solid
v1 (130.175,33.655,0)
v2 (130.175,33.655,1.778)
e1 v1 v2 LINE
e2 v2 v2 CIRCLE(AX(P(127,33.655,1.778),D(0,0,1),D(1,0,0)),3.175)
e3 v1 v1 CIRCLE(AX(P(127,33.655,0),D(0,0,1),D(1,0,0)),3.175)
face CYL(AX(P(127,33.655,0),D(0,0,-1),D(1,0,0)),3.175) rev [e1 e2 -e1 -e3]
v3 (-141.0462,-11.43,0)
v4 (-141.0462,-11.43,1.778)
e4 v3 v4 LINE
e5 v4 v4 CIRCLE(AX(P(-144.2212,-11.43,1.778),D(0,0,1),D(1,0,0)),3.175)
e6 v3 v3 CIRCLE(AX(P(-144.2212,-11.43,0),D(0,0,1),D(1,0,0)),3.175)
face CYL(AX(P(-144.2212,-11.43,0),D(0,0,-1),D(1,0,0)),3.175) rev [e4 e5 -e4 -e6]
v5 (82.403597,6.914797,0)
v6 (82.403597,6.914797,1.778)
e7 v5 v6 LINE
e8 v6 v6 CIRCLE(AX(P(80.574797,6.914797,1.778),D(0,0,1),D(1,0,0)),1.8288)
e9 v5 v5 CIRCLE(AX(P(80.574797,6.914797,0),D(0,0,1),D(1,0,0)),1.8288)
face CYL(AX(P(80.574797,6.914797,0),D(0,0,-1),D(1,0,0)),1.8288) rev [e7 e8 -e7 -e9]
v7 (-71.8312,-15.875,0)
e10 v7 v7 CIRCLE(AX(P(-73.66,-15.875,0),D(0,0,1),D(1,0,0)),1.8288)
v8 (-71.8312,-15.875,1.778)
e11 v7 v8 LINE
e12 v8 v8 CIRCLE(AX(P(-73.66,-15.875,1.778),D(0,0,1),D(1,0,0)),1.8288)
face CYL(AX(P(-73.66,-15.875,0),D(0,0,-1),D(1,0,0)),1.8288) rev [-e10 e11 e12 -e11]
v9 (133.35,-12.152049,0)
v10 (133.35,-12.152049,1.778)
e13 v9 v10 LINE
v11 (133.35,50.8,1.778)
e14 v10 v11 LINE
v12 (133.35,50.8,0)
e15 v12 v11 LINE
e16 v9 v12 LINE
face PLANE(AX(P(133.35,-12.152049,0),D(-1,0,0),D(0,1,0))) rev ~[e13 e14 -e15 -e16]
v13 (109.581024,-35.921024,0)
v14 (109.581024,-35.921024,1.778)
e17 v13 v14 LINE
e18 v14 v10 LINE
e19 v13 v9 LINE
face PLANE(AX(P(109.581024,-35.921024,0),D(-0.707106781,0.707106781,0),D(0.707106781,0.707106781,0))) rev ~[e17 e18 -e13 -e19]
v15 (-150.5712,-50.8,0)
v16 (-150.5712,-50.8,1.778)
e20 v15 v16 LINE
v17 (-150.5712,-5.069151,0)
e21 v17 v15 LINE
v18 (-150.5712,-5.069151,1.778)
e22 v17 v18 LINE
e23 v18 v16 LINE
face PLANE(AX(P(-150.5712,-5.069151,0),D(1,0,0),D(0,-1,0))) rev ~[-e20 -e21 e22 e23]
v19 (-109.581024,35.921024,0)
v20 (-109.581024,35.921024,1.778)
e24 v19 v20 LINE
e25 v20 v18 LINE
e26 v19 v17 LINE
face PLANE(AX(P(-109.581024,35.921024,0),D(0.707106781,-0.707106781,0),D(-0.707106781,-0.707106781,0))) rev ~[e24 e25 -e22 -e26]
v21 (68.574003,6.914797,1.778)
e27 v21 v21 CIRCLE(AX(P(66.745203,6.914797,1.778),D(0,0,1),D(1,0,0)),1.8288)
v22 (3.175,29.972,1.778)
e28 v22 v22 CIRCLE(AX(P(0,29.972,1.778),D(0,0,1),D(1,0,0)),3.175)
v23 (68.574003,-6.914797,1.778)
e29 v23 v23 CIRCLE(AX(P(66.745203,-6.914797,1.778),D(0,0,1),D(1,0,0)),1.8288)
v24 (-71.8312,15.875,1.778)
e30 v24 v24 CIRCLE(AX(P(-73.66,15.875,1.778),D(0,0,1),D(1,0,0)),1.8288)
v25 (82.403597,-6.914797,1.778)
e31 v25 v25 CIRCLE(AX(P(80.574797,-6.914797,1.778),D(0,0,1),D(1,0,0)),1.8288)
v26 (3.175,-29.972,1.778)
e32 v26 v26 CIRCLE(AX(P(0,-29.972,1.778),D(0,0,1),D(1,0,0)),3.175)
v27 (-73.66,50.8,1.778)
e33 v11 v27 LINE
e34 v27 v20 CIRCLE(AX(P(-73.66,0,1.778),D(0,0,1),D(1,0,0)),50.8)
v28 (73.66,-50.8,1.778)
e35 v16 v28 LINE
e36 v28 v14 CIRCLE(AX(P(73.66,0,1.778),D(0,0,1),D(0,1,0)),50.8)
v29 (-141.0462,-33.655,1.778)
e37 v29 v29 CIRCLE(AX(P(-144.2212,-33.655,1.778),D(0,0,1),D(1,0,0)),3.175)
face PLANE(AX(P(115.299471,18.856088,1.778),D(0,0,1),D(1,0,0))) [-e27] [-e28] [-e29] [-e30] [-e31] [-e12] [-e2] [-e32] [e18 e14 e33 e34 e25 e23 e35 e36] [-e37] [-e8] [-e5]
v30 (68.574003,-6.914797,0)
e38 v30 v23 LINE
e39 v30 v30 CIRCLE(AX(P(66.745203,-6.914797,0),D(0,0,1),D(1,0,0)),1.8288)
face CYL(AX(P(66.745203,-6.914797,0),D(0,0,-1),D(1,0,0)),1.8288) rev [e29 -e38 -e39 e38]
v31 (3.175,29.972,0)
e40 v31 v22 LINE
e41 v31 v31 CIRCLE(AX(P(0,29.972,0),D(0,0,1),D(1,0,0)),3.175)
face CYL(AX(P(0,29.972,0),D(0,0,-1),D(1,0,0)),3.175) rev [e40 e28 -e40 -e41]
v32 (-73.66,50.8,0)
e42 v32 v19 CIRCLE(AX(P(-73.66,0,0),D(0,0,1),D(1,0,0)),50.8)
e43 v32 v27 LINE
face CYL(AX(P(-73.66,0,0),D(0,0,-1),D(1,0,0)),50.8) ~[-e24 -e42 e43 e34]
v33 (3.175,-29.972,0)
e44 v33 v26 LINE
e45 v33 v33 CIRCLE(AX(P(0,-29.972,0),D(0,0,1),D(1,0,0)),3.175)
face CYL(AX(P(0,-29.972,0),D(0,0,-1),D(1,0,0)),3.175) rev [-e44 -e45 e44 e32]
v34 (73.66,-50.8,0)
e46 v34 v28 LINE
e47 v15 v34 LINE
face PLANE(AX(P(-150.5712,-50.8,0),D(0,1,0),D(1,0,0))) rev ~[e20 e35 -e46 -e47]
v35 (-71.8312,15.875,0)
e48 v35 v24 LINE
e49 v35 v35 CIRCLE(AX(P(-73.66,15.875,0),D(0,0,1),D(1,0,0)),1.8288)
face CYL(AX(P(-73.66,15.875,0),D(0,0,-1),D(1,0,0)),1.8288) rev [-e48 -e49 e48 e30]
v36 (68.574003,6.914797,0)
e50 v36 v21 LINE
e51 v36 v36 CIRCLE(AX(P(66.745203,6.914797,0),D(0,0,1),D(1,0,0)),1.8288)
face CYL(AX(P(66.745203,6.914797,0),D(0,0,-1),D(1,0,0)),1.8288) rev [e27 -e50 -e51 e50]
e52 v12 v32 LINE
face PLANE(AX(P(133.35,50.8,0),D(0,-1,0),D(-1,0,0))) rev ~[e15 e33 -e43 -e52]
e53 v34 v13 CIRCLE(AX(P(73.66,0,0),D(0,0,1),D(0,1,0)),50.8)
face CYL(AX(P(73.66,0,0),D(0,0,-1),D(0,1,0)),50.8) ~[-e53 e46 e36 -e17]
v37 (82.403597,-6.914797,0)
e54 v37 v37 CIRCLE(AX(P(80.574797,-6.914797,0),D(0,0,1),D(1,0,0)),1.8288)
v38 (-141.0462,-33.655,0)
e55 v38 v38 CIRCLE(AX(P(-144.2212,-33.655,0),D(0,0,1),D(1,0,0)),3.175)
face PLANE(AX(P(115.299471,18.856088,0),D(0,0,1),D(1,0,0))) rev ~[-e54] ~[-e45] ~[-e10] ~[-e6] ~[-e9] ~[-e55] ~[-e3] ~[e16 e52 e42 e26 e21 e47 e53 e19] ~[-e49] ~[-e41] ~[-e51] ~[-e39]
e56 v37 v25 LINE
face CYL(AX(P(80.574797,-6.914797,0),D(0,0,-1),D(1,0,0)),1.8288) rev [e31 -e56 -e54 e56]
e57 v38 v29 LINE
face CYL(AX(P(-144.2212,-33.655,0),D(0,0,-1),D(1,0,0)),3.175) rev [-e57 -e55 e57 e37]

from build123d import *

# Parameters (mm, degrees)
F0_R     = 3.175
F0_R_2   = 1.8288
F1_DEPTH = 1.778


with BuildPart() as f1:
    # F0 (on Top) → F1 (new body)
    with BuildSketch(Plane.XY):
        with BuildLine():
            Line((133.35, -12.1520489686), (133.35, 50.8))
            Line((133.35, 50.8), (73.66, 50.8))
            ThreePointArc((73.66, 50.8), (109.5810244843, 35.9210244843), (124.46, 0))
            ThreePointArc((124.46, 0), (120.5930802516, -19.4403183641), (109.5810244843, -35.9210244843))
            Line((109.5810244843, -35.9210244843), (133.35, -12.1520489686))
        make_face()
        with Locations((127, 33.655)):
            Circle(F0_R, mode=Mode.SUBTRACT)
        with BuildLine():
            ThreePointArc((73.66, -50.8), (22.86, 0), (73.66, 50.8))
            Line((73.66, 50.8), (-73.6599997452, 50.8))
            ThreePointArc((-73.6599997452, 50.8), (-37.7389754256, 35.9210243942), (-22.86, 0))
            ThreePointArc((-22.86, 0), (-37.7389756058, -35.9210245744), (-73.6600002548, -50.8))
            Line((-73.6600002548, -50.8), (73.66, -50.8))
        make_face()
        with Locations((0, -29.972)):
            Circle(F0_R, mode=Mode.SUBTRACT)
        with Locations((0, 29.972)):
            Circle(F0_R, mode=Mode.SUBTRACT)
        with BuildLine():
            ThreePointArc((124.46, 0), (109.5810244843, 35.9210244843), (73.66, 50.8))
            ThreePointArc((73.66, 50.8), (22.86, 0), (73.66, -50.8))
            ThreePointArc((73.66, -50.8), (93.1003183641, -46.9330802516), (109.5810244843, -35.9210244843))
            ThreePointArc((109.5810244843, -35.9210244843), (120.5930802516, -19.4403183641), (124.46, 0))
        make_face()
        with Locations((66.7452027868, -6.9147972132)):
            Circle(F0_R_2, mode=Mode.SUBTRACT)
        with Locations((80.5747972132, -6.9147972132)):
            Circle(F0_R_2, mode=Mode.SUBTRACT)
        with Locations((66.7452027868, 6.9147972132)):
            Circle(F0_R_2, mode=Mode.SUBTRACT)
        with Locations((80.5747972132, 6.9147972132)):
            Circle(F0_R_2, mode=Mode.SUBTRACT)
        with BuildLine():
            ThreePointArc((-22.86, 0), (-37.7389754256, 35.9210243942), (-73.6599997452, 50.8))
            ThreePointArc((-73.6599997452, 50.8), (-93.1003182465, 46.9330803003), (-109.5810244843, 35.9210244843))
            ThreePointArc((-109.5810244843, 35.9210244843), (-120.5930803003, -19.4403182465), (-73.6600002548, -50.8))
            ThreePointArc((-73.6600002548, -50.8), (-37.7389756058, -35.9210245744), (-22.86, 0))
        make_face()
        with Locations((-73.66, -15.875)):
            Circle(F0_R_2, mode=Mode.SUBTRACT)
        with Locations((-73.66, 15.875)):
            Circle(F0_R_2, mode=Mode.SUBTRACT)
        with BuildLine():
            ThreePointArc((-73.6600002548, -50.8), (-120.5930803003, -19.4403182465), (-109.5810244843, 35.9210244843))
            Line((-109.5810244843, 35.9210244843), (-133.35, 12.1520489686))
            Line((-133.35, 12.1520489686), (-133.35, -50.8))
            Line((-133.35, -50.8), (-73.6600002548, -50.8))
        make_face()
        Polygon((-133.35, -50.8), (-133.35, 12.1520489686), (-150.5712, -5.0691510314), (-150.5712, -50.8), align=None)
        with Locations((-144.2212, -33.655)):
            Circle(F0_R, mode=Mode.SUBTRACT)
        with Locations((-144.2212, -11.43)):
            Circle(F0_R, mode=Mode.SUBTRACT)
    extrude(amount=F1_DEPTH)


solid = f1.part
